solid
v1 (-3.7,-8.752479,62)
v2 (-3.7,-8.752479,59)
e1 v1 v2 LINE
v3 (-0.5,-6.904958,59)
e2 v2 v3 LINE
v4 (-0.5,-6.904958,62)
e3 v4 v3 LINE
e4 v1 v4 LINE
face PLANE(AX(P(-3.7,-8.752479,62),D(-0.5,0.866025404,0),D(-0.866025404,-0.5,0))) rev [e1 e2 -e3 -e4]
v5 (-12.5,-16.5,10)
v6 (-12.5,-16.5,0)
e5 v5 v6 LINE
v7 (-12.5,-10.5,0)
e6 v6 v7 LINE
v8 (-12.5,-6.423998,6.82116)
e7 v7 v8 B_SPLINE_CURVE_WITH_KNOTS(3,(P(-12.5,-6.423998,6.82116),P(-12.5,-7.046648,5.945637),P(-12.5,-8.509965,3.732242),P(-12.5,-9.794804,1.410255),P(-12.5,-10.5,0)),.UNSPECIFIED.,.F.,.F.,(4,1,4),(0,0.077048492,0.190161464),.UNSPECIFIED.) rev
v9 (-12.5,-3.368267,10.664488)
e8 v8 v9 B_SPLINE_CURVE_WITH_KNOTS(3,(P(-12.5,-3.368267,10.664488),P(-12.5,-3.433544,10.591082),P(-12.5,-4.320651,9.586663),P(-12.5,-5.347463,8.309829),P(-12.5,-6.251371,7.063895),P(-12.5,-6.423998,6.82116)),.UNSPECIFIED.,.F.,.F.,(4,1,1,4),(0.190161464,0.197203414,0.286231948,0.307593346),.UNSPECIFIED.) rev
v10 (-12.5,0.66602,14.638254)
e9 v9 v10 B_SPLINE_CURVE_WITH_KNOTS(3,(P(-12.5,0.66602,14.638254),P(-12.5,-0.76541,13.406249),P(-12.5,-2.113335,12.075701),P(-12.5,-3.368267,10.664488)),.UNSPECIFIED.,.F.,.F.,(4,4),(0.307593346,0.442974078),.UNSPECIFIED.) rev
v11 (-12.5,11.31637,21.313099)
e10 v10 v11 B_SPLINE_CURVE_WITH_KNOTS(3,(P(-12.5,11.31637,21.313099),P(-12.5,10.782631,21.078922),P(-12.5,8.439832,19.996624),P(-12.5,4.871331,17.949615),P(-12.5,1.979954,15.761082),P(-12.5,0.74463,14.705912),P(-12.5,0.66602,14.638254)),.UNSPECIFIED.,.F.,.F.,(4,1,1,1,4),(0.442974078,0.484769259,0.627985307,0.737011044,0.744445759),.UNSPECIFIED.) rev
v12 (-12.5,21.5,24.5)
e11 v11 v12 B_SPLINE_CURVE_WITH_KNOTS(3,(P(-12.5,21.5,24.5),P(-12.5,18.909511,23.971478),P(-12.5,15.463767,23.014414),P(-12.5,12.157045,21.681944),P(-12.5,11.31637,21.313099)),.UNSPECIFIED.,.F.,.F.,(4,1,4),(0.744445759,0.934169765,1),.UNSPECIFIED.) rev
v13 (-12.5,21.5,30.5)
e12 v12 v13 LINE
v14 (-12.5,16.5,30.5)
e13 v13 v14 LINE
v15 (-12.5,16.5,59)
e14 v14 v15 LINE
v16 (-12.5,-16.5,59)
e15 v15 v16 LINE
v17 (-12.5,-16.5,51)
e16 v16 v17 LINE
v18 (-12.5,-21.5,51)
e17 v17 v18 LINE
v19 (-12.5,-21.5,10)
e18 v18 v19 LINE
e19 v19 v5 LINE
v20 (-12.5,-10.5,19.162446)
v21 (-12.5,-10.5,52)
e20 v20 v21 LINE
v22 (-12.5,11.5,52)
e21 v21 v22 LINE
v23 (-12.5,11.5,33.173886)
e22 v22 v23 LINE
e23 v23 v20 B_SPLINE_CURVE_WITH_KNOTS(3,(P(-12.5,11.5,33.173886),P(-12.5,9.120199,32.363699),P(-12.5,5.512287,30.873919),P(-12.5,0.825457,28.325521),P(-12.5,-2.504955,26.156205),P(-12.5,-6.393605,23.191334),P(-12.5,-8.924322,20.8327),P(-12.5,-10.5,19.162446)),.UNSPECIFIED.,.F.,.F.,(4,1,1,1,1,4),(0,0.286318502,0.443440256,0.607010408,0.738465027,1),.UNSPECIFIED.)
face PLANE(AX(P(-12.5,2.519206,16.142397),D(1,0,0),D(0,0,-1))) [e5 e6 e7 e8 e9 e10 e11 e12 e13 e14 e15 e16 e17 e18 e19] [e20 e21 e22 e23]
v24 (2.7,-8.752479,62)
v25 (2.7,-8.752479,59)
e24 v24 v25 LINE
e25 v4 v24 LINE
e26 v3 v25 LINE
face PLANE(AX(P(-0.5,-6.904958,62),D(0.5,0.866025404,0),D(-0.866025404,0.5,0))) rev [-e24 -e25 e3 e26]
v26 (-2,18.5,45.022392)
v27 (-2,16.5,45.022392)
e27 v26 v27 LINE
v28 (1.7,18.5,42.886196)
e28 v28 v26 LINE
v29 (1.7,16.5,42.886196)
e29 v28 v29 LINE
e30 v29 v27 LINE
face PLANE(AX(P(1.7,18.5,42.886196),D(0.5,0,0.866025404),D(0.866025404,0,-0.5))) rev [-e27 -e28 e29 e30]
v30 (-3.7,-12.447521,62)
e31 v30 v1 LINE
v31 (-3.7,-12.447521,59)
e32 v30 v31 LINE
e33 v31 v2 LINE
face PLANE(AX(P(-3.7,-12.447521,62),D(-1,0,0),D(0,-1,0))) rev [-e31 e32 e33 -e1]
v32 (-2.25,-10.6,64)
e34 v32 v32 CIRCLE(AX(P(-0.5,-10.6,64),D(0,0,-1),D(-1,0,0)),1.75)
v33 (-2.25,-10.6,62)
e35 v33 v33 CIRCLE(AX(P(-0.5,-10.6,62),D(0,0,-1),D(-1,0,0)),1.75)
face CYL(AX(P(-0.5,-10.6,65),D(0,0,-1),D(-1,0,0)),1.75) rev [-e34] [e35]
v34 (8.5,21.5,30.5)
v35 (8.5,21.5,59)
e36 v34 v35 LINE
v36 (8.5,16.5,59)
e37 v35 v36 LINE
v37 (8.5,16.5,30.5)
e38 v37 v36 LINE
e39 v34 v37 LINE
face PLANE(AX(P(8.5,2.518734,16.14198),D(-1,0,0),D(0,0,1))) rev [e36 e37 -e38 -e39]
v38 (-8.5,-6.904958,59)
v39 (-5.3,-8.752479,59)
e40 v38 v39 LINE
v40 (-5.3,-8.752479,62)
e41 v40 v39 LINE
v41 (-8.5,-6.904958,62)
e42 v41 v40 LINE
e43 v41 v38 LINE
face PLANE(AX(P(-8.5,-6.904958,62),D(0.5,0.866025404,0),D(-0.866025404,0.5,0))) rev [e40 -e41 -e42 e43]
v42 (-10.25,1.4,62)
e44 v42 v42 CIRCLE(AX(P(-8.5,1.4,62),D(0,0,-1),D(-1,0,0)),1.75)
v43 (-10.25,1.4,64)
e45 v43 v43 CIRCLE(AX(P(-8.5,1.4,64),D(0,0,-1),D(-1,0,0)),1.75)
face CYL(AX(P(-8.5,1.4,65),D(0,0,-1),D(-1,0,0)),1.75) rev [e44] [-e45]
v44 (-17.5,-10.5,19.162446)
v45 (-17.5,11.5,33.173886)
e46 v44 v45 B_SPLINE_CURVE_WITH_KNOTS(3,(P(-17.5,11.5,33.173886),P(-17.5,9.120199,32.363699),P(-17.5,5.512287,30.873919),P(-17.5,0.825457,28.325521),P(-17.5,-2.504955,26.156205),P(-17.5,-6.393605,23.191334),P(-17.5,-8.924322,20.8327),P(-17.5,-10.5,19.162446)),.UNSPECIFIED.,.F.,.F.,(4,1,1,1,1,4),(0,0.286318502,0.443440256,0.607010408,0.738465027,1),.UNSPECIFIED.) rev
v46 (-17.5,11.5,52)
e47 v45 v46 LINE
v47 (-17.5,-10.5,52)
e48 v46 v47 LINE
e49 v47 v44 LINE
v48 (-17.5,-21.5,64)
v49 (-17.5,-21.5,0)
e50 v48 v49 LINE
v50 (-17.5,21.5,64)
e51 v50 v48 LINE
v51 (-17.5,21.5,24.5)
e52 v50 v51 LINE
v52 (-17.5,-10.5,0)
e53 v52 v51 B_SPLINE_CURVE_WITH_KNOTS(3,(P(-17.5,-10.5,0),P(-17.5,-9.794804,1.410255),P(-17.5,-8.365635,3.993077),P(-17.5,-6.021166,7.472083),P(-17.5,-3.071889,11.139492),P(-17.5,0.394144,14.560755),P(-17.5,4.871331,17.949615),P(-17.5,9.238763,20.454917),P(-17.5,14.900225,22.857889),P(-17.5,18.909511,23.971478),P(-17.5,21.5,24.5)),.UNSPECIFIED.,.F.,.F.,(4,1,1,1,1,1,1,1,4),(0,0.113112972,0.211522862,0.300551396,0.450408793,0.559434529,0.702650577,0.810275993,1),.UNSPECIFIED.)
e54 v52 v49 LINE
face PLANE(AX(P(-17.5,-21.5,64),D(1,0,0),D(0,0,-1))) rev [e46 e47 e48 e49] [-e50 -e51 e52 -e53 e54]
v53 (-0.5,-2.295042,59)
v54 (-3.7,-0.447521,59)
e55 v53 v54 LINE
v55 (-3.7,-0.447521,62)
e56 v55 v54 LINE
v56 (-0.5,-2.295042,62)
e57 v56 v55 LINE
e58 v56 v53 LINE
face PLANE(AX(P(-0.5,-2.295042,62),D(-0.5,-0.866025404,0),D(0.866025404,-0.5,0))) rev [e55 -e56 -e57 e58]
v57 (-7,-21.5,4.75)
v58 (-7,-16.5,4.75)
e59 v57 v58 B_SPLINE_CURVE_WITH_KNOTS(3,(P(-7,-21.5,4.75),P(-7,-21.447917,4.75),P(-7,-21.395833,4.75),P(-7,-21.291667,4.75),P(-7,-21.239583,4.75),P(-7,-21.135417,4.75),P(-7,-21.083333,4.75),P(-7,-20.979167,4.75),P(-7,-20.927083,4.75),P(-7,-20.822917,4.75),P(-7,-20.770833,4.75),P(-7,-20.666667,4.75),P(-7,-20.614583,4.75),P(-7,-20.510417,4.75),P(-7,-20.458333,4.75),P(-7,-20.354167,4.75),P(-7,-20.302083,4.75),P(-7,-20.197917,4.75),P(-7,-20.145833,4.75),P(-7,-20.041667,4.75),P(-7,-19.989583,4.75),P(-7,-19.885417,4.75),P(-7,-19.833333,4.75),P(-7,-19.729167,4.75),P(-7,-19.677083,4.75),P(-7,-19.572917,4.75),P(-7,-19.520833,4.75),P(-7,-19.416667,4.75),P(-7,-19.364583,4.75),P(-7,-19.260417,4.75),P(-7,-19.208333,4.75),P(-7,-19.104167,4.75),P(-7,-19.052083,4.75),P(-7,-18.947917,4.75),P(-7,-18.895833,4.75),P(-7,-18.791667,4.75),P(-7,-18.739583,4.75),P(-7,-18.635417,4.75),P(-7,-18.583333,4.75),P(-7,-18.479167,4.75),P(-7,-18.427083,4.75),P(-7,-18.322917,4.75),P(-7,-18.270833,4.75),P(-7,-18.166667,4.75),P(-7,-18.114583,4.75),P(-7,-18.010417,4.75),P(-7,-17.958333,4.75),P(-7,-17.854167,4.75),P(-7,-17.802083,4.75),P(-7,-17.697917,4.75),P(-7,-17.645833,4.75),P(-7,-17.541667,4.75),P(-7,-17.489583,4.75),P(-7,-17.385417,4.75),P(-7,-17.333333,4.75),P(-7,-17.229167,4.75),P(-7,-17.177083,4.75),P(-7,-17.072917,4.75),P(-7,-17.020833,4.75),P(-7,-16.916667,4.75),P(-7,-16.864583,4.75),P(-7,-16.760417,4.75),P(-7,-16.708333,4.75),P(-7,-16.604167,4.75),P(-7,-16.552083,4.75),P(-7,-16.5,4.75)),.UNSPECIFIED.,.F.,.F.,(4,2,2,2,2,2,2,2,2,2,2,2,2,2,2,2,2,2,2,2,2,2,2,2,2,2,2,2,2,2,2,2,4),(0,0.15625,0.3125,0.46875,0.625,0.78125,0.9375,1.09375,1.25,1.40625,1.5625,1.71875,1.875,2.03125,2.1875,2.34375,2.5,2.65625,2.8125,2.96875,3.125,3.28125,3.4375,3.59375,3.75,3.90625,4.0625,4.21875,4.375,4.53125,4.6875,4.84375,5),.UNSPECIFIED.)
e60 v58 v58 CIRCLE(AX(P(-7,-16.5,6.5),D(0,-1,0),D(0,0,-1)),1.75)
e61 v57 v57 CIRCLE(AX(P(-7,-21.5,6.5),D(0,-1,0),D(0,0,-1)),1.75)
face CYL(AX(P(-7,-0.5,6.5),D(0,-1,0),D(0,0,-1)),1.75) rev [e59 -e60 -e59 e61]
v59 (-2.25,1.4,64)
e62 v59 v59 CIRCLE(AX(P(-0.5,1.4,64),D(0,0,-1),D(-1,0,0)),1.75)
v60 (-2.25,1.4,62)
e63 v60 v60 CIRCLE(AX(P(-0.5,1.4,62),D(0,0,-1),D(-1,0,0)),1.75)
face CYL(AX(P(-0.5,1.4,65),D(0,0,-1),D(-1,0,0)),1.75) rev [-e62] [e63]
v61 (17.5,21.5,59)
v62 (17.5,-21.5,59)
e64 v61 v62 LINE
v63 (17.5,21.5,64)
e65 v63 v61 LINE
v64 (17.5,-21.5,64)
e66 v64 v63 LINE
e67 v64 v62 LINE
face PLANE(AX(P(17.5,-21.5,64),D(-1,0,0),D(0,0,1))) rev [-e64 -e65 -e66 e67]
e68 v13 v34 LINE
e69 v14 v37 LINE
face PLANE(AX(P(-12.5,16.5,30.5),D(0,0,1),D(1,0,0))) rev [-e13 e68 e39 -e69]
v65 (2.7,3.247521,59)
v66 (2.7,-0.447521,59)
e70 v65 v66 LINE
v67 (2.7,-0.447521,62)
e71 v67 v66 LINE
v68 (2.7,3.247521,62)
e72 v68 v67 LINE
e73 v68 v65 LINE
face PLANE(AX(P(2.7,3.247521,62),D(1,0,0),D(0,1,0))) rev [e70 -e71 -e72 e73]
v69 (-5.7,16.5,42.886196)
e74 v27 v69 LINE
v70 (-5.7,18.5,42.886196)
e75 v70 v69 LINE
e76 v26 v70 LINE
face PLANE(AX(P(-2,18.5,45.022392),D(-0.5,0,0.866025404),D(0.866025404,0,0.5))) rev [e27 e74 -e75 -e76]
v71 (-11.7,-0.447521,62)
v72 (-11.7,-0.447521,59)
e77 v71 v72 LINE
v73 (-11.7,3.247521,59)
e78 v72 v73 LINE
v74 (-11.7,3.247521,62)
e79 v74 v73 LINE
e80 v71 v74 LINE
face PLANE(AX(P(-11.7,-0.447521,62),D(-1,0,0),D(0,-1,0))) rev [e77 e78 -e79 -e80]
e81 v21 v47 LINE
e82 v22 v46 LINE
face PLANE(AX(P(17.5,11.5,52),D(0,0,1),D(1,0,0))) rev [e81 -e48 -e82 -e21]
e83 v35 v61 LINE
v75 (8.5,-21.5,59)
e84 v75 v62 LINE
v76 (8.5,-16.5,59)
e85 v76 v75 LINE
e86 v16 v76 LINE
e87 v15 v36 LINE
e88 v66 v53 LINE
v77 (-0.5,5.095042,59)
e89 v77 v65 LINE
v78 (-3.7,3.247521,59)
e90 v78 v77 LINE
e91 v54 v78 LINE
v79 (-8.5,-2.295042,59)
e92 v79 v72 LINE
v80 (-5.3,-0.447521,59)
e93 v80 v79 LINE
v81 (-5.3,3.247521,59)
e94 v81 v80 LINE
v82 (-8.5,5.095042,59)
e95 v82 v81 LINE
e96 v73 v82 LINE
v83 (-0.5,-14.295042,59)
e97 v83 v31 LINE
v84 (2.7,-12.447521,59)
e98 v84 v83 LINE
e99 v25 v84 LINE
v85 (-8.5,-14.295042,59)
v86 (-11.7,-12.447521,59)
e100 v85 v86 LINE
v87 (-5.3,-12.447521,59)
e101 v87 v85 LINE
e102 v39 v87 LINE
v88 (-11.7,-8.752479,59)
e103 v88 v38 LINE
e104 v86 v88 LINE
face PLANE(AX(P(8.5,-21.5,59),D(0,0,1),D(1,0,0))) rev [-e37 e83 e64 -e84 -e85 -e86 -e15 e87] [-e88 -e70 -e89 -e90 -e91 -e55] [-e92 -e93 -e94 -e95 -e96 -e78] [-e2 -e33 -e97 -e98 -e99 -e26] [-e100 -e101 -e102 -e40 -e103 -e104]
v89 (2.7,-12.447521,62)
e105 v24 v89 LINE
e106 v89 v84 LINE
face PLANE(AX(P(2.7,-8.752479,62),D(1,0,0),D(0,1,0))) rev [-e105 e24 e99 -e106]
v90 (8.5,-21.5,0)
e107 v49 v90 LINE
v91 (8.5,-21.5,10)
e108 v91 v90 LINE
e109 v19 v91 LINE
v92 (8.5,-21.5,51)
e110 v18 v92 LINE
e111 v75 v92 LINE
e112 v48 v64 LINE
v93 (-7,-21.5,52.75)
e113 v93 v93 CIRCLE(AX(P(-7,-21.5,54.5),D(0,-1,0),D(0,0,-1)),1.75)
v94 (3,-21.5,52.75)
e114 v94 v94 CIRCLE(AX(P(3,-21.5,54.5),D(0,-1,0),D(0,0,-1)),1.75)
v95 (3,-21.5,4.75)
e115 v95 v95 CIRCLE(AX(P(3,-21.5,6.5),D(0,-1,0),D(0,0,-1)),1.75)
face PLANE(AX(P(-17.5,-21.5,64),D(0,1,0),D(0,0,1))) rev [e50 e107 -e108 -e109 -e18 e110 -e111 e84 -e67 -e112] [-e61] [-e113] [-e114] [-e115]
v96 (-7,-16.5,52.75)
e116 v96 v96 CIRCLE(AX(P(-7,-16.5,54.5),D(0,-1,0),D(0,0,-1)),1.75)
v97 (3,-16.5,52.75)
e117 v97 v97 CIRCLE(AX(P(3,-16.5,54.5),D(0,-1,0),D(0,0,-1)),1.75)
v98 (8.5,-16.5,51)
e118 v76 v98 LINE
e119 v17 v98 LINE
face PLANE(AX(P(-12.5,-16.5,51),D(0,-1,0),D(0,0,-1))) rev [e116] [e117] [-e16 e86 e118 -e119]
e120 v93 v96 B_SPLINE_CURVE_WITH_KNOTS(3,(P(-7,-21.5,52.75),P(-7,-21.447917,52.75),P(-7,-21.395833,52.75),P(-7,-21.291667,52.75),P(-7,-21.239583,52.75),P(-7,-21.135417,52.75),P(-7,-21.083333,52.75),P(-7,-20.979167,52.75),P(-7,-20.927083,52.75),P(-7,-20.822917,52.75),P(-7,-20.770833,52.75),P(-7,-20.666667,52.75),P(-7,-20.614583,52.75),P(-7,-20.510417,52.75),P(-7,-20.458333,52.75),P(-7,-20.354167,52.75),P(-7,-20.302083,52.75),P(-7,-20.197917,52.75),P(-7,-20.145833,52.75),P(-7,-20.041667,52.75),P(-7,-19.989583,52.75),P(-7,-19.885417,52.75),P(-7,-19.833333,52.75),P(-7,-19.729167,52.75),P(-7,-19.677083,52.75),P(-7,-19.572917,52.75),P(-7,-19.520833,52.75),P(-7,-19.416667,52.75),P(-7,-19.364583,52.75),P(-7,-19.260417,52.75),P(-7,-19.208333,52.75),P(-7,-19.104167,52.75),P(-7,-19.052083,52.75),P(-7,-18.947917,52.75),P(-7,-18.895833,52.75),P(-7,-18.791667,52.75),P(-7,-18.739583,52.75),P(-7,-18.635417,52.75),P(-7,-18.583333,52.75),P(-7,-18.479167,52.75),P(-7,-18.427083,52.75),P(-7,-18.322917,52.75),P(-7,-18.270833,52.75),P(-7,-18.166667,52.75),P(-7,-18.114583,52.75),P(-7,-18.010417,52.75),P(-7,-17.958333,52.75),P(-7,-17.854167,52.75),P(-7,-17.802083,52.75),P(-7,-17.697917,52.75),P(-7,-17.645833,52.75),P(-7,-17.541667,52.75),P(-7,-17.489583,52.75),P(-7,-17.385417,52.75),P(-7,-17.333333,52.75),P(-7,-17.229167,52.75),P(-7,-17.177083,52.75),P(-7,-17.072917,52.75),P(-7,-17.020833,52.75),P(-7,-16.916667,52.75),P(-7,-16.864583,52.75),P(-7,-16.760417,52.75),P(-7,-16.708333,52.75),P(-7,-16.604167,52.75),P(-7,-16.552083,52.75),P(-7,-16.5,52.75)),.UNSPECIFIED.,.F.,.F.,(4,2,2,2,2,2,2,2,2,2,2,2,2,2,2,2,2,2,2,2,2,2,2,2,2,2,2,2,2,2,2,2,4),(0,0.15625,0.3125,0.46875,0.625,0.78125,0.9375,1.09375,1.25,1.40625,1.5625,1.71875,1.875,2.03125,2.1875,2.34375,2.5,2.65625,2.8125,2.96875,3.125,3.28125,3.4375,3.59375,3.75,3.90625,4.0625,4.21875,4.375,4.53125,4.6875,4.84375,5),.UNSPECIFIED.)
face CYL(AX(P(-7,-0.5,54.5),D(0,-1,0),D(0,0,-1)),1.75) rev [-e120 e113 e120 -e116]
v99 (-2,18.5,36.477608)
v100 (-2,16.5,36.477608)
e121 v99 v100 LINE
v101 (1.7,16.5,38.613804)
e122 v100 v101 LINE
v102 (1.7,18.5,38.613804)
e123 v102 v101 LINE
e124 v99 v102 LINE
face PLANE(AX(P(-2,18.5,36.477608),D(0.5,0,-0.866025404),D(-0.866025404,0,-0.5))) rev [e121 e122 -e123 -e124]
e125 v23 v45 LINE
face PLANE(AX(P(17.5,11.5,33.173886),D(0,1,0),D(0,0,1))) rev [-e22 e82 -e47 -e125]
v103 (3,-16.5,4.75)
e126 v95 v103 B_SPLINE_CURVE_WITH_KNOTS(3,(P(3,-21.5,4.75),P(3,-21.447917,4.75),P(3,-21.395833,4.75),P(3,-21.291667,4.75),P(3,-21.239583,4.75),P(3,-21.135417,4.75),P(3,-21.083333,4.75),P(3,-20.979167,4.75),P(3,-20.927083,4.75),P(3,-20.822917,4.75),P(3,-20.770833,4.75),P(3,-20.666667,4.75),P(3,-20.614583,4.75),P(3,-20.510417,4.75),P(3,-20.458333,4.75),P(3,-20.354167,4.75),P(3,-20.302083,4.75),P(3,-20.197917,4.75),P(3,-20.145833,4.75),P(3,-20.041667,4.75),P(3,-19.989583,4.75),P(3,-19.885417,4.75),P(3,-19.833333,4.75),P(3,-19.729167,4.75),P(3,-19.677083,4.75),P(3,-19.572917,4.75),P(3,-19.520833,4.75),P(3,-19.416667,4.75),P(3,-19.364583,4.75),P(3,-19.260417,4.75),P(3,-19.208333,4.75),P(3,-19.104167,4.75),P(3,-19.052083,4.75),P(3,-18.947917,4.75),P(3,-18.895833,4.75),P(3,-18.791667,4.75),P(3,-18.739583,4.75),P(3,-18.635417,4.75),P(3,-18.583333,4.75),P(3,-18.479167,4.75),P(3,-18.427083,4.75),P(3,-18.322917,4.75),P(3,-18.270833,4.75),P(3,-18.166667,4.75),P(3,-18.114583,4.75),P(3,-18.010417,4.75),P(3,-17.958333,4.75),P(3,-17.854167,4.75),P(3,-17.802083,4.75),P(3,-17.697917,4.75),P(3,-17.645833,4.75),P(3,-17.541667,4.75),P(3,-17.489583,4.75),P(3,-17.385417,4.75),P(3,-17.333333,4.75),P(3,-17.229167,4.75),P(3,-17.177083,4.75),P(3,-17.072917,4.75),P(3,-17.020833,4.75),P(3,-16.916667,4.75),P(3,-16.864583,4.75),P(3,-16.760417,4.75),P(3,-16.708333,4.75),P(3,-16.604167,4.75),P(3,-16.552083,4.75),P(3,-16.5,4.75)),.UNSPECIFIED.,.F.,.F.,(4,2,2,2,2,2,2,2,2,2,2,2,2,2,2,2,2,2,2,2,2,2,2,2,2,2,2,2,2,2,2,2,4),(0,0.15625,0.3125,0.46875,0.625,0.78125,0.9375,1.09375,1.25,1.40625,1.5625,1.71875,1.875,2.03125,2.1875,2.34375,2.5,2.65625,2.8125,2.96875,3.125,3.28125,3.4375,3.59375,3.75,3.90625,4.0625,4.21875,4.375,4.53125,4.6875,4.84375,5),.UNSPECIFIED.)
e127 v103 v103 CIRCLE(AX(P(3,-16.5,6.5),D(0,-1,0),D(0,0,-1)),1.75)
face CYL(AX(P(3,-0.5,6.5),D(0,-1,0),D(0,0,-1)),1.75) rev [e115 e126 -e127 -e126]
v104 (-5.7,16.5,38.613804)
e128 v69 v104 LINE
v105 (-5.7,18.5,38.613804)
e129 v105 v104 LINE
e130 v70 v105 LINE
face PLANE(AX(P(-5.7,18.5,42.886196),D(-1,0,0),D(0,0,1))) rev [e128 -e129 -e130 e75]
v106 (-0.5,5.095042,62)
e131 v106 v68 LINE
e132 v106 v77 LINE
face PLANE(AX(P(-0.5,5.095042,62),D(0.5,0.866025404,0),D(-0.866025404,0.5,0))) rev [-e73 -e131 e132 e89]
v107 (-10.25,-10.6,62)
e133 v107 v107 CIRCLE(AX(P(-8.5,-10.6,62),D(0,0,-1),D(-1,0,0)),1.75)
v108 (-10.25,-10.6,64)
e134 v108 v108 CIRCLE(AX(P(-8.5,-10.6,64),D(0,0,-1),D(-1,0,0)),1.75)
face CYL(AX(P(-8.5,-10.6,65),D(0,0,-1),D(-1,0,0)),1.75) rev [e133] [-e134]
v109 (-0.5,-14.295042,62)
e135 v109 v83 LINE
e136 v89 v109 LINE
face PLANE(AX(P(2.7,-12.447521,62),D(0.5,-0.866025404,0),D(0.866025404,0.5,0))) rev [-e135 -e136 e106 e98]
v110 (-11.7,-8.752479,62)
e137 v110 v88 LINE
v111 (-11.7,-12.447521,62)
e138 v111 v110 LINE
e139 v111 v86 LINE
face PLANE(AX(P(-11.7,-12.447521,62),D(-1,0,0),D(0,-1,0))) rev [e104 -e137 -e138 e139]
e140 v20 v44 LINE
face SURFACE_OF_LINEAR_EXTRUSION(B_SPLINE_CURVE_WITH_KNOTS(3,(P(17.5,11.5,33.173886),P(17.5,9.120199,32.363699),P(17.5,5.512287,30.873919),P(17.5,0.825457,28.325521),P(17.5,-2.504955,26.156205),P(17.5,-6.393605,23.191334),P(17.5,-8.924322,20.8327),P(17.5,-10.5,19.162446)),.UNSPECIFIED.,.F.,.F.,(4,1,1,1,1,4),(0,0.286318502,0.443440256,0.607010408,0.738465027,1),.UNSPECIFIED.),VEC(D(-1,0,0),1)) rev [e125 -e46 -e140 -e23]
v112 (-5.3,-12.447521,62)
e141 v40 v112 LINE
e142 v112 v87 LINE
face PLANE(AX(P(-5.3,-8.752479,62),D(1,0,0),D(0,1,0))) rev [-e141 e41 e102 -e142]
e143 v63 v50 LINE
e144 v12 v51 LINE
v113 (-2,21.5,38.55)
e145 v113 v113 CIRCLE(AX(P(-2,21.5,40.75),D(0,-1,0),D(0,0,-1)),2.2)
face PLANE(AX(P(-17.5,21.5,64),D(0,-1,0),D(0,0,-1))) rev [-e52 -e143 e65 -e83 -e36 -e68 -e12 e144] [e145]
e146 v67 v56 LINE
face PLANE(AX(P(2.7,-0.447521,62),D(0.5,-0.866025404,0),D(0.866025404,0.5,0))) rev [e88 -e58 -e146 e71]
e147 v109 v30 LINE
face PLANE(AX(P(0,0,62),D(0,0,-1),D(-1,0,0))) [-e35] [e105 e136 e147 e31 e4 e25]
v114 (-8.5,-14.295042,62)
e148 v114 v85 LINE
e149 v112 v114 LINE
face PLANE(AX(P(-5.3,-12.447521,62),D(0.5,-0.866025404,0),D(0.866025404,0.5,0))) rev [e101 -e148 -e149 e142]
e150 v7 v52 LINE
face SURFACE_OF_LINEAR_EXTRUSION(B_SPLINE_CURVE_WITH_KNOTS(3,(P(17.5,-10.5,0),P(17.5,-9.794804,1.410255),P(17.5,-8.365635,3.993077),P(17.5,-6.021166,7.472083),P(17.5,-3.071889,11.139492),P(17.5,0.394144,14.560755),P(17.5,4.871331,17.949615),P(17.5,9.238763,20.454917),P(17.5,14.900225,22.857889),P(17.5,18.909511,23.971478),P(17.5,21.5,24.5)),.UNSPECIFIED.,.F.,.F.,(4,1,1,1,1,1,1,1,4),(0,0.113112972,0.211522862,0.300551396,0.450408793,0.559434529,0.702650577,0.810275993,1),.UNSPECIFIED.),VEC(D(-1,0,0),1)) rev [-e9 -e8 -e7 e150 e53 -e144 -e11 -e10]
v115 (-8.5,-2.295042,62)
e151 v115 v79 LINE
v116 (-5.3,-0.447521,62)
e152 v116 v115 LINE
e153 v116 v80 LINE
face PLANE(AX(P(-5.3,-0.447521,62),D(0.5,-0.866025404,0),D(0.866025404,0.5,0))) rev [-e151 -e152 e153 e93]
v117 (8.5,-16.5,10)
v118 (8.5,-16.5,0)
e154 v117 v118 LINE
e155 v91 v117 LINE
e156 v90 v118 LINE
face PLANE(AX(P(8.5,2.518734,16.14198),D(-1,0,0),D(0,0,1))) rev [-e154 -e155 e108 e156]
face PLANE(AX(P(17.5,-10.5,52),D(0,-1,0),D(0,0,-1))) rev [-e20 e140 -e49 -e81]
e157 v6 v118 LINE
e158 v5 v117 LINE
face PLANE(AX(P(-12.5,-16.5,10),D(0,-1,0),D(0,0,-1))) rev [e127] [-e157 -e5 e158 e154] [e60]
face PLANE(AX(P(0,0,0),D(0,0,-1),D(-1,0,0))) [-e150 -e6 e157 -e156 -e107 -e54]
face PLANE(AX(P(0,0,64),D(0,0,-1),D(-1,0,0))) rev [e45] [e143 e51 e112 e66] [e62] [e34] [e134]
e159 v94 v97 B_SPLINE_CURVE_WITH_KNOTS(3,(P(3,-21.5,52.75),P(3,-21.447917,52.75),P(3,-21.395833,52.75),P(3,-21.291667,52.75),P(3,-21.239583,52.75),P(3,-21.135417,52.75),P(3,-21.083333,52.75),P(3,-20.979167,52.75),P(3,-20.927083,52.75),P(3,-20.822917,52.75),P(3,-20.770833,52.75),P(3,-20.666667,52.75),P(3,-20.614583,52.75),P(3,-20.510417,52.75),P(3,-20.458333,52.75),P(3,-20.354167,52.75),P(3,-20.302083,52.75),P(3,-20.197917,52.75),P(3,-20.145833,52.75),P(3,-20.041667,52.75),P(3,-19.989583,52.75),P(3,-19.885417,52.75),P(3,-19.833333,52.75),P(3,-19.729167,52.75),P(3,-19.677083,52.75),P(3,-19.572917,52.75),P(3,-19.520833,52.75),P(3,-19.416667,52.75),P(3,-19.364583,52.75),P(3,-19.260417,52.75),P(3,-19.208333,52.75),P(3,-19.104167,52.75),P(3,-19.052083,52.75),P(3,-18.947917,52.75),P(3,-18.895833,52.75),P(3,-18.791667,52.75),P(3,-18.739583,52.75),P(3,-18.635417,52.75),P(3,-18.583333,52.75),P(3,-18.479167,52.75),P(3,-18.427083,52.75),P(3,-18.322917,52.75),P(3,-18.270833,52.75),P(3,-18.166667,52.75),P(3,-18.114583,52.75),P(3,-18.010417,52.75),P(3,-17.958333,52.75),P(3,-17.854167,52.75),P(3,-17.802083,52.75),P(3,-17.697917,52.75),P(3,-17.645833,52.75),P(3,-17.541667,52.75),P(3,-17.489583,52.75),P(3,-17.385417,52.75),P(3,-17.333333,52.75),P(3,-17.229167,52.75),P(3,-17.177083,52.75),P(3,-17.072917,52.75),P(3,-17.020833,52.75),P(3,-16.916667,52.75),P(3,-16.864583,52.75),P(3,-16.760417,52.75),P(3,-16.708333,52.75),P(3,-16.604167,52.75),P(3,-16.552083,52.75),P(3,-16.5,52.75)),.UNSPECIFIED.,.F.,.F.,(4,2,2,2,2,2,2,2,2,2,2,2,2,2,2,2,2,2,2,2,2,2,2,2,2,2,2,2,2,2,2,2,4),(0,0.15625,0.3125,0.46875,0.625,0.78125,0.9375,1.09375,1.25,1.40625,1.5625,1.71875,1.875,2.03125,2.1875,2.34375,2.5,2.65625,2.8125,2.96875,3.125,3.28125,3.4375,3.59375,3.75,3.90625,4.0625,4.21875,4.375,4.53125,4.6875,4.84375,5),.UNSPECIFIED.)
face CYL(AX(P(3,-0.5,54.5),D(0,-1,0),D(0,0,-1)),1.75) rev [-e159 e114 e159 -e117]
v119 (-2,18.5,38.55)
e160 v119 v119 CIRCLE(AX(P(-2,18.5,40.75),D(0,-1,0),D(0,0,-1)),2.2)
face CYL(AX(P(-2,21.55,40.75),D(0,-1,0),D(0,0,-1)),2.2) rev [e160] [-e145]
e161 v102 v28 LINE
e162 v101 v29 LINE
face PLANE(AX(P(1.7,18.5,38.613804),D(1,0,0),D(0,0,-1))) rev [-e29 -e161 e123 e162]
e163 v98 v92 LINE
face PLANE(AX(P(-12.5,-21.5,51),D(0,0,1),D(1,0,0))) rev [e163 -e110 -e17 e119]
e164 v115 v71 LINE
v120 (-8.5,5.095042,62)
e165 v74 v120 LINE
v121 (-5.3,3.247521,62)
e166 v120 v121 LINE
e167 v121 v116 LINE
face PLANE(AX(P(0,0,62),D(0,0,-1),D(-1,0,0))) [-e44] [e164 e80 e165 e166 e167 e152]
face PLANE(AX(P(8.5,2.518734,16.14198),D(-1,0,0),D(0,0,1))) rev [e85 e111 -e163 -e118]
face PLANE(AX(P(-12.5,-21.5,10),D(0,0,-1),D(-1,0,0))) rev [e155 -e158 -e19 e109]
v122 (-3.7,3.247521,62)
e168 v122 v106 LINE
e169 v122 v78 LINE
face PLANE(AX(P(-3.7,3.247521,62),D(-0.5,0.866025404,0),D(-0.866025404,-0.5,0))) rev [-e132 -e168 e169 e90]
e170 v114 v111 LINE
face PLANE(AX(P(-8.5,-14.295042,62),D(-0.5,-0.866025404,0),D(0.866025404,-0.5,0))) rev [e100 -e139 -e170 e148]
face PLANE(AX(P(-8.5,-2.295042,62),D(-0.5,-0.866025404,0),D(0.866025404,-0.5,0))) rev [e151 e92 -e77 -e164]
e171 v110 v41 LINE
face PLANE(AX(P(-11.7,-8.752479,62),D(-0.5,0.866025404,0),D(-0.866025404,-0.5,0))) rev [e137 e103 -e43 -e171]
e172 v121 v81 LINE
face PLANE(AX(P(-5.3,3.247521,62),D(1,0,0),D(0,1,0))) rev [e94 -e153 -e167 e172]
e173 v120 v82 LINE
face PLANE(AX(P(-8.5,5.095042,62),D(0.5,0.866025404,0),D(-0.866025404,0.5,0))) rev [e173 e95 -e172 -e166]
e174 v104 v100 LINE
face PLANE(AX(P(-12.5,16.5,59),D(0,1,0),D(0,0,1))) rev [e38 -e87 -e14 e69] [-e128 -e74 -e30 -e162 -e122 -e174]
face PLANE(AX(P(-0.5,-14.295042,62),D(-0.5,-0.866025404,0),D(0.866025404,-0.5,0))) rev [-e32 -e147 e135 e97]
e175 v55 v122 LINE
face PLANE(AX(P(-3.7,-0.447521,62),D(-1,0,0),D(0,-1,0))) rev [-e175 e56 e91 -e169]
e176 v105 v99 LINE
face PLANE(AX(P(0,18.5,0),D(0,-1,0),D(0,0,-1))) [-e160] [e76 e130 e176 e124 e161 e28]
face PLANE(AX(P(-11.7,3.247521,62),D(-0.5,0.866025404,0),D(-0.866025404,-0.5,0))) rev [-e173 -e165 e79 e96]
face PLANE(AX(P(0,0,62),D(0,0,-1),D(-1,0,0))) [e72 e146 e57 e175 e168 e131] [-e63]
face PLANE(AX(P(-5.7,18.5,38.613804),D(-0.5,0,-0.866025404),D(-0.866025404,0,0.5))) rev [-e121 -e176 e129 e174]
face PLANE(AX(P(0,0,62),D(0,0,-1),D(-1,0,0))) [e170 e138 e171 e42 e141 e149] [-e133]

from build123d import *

# Parameters (mm, degrees)
SKETCH1_W               = 35
SKETCH1_H               = 43
BOSS_EXTRUDE1_DEPTH     = 64
CUT_EXTRUDE1_DEPTH      = 77.04768241
CUT_EXTRUDE1_DEPTH_BACK = 77.04768241
CUT_EXTRUDE2_START      = -9
CUT_EXTRUDE2_DEPTH      = 9
CUT_EXTRUDE3_START      = -21
CUT_EXTRUDE3_DEPTH      = 21
SKETCH5_R               = 1.75
CUT_EXTRUDE4_DEPTH      = 21
CUT_EXTRUDE5_DEPTH      = 3
SKETCH7_R               = 1.75
CUT_EXTRUDE6_DEPTH      = 3
CUT_EXTRUDE7_DEPTH      = 2
SKETCH9_R               = 2.2
CUT_EXTRUDE8_DEPTH      = 78.474189407


# Read off the part's stored shape, not the designer's step: Cut-Extrude2, Cut-Extrude3
with BuildPart() as part:
    # Sketch1 → Boss-Extrude1 (new body)
    with BuildSketch(Plane.XY):
        Rectangle(SKETCH1_W, SKETCH1_H)
    extrude(amount=BOSS_EXTRUDE1_DEPTH)

    # Sketch2 → Cut-Extrude1 (cut, two sides: drawn at the far end of the back side and taken through both)
    with BuildSketch(Plane.ZY.offset(17.5).offset(-CUT_EXTRUDE1_DEPTH_BACK)):
        with BuildLine():
            Line((33.173885888, 11.5), (52, 11.5))
            Line((52, 11.5), (52, -10.5))
            Line((52, -10.5), (19.162446424, -10.499999995))
            add(Edge.make_bspline(
                [(19.162446424, -10.499999995), (20.832699675, -8.924322211), (23.191334331, -6.393604558), (26.156205176, -2.504954915), (28.325520723, 0.825456595), (30.873918563, 5.512287152), (32.363699443, 9.120198936), (33.173885888, 11.5)],
                knots=[0, 0, 0, 0, 0.261534973, 0.392989592, 0.556559744, 0.713681498, 1, 1, 1, 1], degree=3))
        make_face()
        with BuildLine():
            Line((0, -10.5), (0, 21.5))
            Line((0, 21.5), (24.5, 21.5))
            add(Edge.make_bspline(
                [(0, -10.5), (1.410254908, -9.794803553), (3.993077245, -8.365634948), (7.472082945, -6.021166025), (11.139491519, -3.071889035), (14.560754773, 0.394143772), (17.949614827, 4.871331165), (20.454917465, 9.23876326), (22.857889337, 14.900225374), (23.971477933, 18.909511405), (24.5, 21.5)],
                knots=[0, 0, 0, 0, 0.113112972, 0.211522862, 0.300551396, 0.450408793, 0.559434529, 0.702650577, 0.810275993, 1, 1, 1, 1], degree=3))
        make_face()
    extrude(amount=CUT_EXTRUDE1_DEPTH + CUT_EXTRUDE1_DEPTH_BACK, mode=Mode.SUBTRACT)

    # Cut-Extrude2 outline → Cut-Extrude2 (cut)
    with BuildSketch(Plane(origin=(17.5, 0, 0), x_dir=(0, 0, -1), z_dir=(1, 0, 0)).offset(CUT_EXTRUDE2_START)):
        with BuildLine():
            Line((-24.5, 21.5), (-59, 21.5))
            Line((-59, 21.5), (-59, -21.5))
            Line((-59, -21.5), (0, -21.5))
            Line((0, -21.5), (0, -10.5))
            add(Edge.make_bspline(
                [(0, -10.5), (-1.410254908, -9.794803553), (-3.993077245, -8.365634948), (-7.472082945, -6.021166025), (-11.139491519, -3.071889035), (-14.560754773, 0.394143772), (-17.949614827, 4.871331165), (-20.454917465, 9.23876326), (-22.857889337, 14.900225374), (-23.971477933, 18.909511405), (-24.5, 21.5)],
                knots=[0, 0, 0, 0, 0.113112972, 0.211522862, 0.300551396, 0.450408793, 0.559434529, 0.702650577, 0.810275993, 1, 1, 1, 1], degree=3))
        make_face()
        with BuildLine():
            Line((-52, 11.5), (-33.173885888, 11.5))
            add(Edge.make_bspline(
                [(-33.173885888, 11.5), (-32.363699443, 9.120198936), (-30.873918563, 5.512287152), (-28.325520723, 0.825456595), (-26.156205176, -2.504954915), (-23.191334331, -6.393604558), (-20.832699675, -8.924322211), (-19.162446424, -10.499999995)],
                knots=[0, 0, 0, 0, 0.286318502, 0.443440256, 0.607010408, 0.738465027, 1, 1, 1, 1], degree=3))
            Line((-19.162446424, -10.499999995), (-52, -10.5))
            Line((-52, -10.5), (-52, 11.5))
        make_face(mode=Mode.SUBTRACT)
    extrude(amount=CUT_EXTRUDE2_DEPTH, mode=Mode.SUBTRACT)

    # Cut-Extrude3 outline → Cut-Extrude3 (cut)
    with BuildSketch(Plane(origin=(8.5, 0, 0), x_dir=(0, 0, -1), z_dir=(1, 0, 0)).offset(CUT_EXTRUDE3_START)):
        with BuildLine():
            Line((-30.5, 16.5), (-59, 16.5))
            Line((-59, 16.5), (-59, -16.5))
            Line((-59, -16.5), (-51, -16.5))
            Line((-51, -16.5), (-51, -21.5))
            Line((-51, -21.5), (-10, -21.5))
            Line((-10, -21.5), (-10, -16.5))
            Line((-10, -16.5), (0, -16.5))
            Line((0, -16.5), (0, -10.5))
            add(Edge.make_bspline(
                [(0, -10.5), (-1.410254908, -9.794803553), (-3.993077245, -8.365634948), (-7.472082945, -6.021166025), (-11.139491519, -3.071889035), (-14.560754773, 0.394143772), (-17.949614827, 4.871331165), (-20.454917465, 9.23876326), (-22.857889337, 14.900225374), (-23.971477933, 18.909511405), (-24.5, 21.5)],
                knots=[0, 0, 0, 0, 0.113112972, 0.211522862, 0.300551396, 0.450408793, 0.559434529, 0.702650577, 0.810275993, 1, 1, 1, 1], degree=3))
            Line((-24.5, 21.5), (-30.5, 21.5))
            Line((-30.5, 21.5), (-30.5, 16.5))
        make_face()
        with BuildLine():
            Line((-52, 11.5), (-33.173885888, 11.5))
            add(Edge.make_bspline(
                [(-33.173885888, 11.5), (-32.363699443, 9.120198936), (-30.873918563, 5.512287152), (-28.325520723, 0.825456595), (-26.156205176, -2.504954915), (-23.191334331, -6.393604558), (-20.832699675, -8.924322211), (-19.162446424, -10.499999995)],
                knots=[0, 0, 0, 0, 0.286318502, 0.443440256, 0.607010408, 0.738465027, 1, 1, 1, 1], degree=3))
            Line((-19.162446424, -10.499999995), (-52, -10.5))
            Line((-52, -10.5), (-52, 11.5))
        make_face(mode=Mode.SUBTRACT)
    extrude(amount=CUT_EXTRUDE3_DEPTH, mode=Mode.SUBTRACT)

    # Sketch5 → Cut-Extrude4 (cut)
    with BuildSketch(Plane.XZ.offset(21.5)):
        with Locations(Location((3, 54.5, 0), (0, 0, 270))):
            Circle(SKETCH5_R)
        with Locations(Location((-7, 54.5, 0), (0, 0, 270))):
            Circle(SKETCH5_R)
        with Locations(Location((-7, 6.5, 0), (0, 0, 270))):
            Circle(SKETCH5_R)
        with Locations(Location((3, 6.5, 0), (0, 0, 270))):
            Circle(SKETCH5_R)
    extrude(amount=-CUT_EXTRUDE4_DEPTH, mode=Mode.SUBTRACT)

    # Sketch6 → Cut-Extrude5 (cut)
    with BuildSketch(Plane(origin=(0, 0, 59), x_dir=(-1, 0, 0), z_dir=(0, 0, -1))):
        Polygon((0.5, 5.095041723), (-2.7, 3.247520861), (-2.7, -0.447520861), (0.5, -2.295041723), (3.7, -0.447520861), (3.7, 3.247520861), align=None)
        Polygon((8.5, 5.095041723), (5.3, 3.247520861), (5.3, -0.447520861), (8.5, -2.295041723), (11.7, -0.447520861), (11.7, 3.247520861), align=None)
        Polygon((8.5, -6.904958277), (5.3, -8.752479139), (5.3, -12.447520861), (8.5, -14.295041723), (11.7, -12.447520861), (11.7, -8.752479139), align=None)
        Polygon((0.5, -6.904958277), (-2.7, -8.752479139), (-2.7, -12.447520861), (0.5, -14.295041723), (3.7, -12.447520861), (3.7, -8.752479139), align=None)
    extrude(amount=-CUT_EXTRUDE5_DEPTH, mode=Mode.SUBTRACT)

    # Sketch7 → Cut-Extrude6 (cut)
    with BuildSketch(Plane(origin=(0, 0, 62), x_dir=(-1, 0, 0), z_dir=(0, 0, -1))):
        with Locations((0.5, 1.4)):
            Circle(SKETCH7_R)
        with Locations((8.5, 1.4)):
            Circle(SKETCH7_R)
        with Locations((8.5, -10.6)):
            Circle(SKETCH7_R)
        with Locations((0.5, -10.6)):
            Circle(SKETCH7_R)
    extrude(amount=-CUT_EXTRUDE6_DEPTH, mode=Mode.SUBTRACT)

    # Sketch8 → Cut-Extrude7 (cut)
    with BuildSketch(Plane.XZ.offset(-16.5)):
        Polygon((1.7, 38.613804004), (1.7, 42.886195996), (-2, 45.022391992), (-5.7, 42.886195996), (-5.7, 38.613804004), (-2, 36.477608008), align=None)
    extrude(amount=-CUT_EXTRUDE7_DEPTH, mode=Mode.SUBTRACT)

    # Sketch9 → Cut-Extrude8 (cut, through all)
    with BuildSketch(Plane(origin=(0, 18.5, 0), x_dir=(-1, 0, 0), z_dir=(0, -1, 0))):
        with Locations(Location((2, -40.75, 0), (0, 0, 90))):
            Circle(SKETCH9_R)
    extrude(amount=-CUT_EXTRUDE8_DEPTH, mode=Mode.SUBTRACT)


solid = part.part
